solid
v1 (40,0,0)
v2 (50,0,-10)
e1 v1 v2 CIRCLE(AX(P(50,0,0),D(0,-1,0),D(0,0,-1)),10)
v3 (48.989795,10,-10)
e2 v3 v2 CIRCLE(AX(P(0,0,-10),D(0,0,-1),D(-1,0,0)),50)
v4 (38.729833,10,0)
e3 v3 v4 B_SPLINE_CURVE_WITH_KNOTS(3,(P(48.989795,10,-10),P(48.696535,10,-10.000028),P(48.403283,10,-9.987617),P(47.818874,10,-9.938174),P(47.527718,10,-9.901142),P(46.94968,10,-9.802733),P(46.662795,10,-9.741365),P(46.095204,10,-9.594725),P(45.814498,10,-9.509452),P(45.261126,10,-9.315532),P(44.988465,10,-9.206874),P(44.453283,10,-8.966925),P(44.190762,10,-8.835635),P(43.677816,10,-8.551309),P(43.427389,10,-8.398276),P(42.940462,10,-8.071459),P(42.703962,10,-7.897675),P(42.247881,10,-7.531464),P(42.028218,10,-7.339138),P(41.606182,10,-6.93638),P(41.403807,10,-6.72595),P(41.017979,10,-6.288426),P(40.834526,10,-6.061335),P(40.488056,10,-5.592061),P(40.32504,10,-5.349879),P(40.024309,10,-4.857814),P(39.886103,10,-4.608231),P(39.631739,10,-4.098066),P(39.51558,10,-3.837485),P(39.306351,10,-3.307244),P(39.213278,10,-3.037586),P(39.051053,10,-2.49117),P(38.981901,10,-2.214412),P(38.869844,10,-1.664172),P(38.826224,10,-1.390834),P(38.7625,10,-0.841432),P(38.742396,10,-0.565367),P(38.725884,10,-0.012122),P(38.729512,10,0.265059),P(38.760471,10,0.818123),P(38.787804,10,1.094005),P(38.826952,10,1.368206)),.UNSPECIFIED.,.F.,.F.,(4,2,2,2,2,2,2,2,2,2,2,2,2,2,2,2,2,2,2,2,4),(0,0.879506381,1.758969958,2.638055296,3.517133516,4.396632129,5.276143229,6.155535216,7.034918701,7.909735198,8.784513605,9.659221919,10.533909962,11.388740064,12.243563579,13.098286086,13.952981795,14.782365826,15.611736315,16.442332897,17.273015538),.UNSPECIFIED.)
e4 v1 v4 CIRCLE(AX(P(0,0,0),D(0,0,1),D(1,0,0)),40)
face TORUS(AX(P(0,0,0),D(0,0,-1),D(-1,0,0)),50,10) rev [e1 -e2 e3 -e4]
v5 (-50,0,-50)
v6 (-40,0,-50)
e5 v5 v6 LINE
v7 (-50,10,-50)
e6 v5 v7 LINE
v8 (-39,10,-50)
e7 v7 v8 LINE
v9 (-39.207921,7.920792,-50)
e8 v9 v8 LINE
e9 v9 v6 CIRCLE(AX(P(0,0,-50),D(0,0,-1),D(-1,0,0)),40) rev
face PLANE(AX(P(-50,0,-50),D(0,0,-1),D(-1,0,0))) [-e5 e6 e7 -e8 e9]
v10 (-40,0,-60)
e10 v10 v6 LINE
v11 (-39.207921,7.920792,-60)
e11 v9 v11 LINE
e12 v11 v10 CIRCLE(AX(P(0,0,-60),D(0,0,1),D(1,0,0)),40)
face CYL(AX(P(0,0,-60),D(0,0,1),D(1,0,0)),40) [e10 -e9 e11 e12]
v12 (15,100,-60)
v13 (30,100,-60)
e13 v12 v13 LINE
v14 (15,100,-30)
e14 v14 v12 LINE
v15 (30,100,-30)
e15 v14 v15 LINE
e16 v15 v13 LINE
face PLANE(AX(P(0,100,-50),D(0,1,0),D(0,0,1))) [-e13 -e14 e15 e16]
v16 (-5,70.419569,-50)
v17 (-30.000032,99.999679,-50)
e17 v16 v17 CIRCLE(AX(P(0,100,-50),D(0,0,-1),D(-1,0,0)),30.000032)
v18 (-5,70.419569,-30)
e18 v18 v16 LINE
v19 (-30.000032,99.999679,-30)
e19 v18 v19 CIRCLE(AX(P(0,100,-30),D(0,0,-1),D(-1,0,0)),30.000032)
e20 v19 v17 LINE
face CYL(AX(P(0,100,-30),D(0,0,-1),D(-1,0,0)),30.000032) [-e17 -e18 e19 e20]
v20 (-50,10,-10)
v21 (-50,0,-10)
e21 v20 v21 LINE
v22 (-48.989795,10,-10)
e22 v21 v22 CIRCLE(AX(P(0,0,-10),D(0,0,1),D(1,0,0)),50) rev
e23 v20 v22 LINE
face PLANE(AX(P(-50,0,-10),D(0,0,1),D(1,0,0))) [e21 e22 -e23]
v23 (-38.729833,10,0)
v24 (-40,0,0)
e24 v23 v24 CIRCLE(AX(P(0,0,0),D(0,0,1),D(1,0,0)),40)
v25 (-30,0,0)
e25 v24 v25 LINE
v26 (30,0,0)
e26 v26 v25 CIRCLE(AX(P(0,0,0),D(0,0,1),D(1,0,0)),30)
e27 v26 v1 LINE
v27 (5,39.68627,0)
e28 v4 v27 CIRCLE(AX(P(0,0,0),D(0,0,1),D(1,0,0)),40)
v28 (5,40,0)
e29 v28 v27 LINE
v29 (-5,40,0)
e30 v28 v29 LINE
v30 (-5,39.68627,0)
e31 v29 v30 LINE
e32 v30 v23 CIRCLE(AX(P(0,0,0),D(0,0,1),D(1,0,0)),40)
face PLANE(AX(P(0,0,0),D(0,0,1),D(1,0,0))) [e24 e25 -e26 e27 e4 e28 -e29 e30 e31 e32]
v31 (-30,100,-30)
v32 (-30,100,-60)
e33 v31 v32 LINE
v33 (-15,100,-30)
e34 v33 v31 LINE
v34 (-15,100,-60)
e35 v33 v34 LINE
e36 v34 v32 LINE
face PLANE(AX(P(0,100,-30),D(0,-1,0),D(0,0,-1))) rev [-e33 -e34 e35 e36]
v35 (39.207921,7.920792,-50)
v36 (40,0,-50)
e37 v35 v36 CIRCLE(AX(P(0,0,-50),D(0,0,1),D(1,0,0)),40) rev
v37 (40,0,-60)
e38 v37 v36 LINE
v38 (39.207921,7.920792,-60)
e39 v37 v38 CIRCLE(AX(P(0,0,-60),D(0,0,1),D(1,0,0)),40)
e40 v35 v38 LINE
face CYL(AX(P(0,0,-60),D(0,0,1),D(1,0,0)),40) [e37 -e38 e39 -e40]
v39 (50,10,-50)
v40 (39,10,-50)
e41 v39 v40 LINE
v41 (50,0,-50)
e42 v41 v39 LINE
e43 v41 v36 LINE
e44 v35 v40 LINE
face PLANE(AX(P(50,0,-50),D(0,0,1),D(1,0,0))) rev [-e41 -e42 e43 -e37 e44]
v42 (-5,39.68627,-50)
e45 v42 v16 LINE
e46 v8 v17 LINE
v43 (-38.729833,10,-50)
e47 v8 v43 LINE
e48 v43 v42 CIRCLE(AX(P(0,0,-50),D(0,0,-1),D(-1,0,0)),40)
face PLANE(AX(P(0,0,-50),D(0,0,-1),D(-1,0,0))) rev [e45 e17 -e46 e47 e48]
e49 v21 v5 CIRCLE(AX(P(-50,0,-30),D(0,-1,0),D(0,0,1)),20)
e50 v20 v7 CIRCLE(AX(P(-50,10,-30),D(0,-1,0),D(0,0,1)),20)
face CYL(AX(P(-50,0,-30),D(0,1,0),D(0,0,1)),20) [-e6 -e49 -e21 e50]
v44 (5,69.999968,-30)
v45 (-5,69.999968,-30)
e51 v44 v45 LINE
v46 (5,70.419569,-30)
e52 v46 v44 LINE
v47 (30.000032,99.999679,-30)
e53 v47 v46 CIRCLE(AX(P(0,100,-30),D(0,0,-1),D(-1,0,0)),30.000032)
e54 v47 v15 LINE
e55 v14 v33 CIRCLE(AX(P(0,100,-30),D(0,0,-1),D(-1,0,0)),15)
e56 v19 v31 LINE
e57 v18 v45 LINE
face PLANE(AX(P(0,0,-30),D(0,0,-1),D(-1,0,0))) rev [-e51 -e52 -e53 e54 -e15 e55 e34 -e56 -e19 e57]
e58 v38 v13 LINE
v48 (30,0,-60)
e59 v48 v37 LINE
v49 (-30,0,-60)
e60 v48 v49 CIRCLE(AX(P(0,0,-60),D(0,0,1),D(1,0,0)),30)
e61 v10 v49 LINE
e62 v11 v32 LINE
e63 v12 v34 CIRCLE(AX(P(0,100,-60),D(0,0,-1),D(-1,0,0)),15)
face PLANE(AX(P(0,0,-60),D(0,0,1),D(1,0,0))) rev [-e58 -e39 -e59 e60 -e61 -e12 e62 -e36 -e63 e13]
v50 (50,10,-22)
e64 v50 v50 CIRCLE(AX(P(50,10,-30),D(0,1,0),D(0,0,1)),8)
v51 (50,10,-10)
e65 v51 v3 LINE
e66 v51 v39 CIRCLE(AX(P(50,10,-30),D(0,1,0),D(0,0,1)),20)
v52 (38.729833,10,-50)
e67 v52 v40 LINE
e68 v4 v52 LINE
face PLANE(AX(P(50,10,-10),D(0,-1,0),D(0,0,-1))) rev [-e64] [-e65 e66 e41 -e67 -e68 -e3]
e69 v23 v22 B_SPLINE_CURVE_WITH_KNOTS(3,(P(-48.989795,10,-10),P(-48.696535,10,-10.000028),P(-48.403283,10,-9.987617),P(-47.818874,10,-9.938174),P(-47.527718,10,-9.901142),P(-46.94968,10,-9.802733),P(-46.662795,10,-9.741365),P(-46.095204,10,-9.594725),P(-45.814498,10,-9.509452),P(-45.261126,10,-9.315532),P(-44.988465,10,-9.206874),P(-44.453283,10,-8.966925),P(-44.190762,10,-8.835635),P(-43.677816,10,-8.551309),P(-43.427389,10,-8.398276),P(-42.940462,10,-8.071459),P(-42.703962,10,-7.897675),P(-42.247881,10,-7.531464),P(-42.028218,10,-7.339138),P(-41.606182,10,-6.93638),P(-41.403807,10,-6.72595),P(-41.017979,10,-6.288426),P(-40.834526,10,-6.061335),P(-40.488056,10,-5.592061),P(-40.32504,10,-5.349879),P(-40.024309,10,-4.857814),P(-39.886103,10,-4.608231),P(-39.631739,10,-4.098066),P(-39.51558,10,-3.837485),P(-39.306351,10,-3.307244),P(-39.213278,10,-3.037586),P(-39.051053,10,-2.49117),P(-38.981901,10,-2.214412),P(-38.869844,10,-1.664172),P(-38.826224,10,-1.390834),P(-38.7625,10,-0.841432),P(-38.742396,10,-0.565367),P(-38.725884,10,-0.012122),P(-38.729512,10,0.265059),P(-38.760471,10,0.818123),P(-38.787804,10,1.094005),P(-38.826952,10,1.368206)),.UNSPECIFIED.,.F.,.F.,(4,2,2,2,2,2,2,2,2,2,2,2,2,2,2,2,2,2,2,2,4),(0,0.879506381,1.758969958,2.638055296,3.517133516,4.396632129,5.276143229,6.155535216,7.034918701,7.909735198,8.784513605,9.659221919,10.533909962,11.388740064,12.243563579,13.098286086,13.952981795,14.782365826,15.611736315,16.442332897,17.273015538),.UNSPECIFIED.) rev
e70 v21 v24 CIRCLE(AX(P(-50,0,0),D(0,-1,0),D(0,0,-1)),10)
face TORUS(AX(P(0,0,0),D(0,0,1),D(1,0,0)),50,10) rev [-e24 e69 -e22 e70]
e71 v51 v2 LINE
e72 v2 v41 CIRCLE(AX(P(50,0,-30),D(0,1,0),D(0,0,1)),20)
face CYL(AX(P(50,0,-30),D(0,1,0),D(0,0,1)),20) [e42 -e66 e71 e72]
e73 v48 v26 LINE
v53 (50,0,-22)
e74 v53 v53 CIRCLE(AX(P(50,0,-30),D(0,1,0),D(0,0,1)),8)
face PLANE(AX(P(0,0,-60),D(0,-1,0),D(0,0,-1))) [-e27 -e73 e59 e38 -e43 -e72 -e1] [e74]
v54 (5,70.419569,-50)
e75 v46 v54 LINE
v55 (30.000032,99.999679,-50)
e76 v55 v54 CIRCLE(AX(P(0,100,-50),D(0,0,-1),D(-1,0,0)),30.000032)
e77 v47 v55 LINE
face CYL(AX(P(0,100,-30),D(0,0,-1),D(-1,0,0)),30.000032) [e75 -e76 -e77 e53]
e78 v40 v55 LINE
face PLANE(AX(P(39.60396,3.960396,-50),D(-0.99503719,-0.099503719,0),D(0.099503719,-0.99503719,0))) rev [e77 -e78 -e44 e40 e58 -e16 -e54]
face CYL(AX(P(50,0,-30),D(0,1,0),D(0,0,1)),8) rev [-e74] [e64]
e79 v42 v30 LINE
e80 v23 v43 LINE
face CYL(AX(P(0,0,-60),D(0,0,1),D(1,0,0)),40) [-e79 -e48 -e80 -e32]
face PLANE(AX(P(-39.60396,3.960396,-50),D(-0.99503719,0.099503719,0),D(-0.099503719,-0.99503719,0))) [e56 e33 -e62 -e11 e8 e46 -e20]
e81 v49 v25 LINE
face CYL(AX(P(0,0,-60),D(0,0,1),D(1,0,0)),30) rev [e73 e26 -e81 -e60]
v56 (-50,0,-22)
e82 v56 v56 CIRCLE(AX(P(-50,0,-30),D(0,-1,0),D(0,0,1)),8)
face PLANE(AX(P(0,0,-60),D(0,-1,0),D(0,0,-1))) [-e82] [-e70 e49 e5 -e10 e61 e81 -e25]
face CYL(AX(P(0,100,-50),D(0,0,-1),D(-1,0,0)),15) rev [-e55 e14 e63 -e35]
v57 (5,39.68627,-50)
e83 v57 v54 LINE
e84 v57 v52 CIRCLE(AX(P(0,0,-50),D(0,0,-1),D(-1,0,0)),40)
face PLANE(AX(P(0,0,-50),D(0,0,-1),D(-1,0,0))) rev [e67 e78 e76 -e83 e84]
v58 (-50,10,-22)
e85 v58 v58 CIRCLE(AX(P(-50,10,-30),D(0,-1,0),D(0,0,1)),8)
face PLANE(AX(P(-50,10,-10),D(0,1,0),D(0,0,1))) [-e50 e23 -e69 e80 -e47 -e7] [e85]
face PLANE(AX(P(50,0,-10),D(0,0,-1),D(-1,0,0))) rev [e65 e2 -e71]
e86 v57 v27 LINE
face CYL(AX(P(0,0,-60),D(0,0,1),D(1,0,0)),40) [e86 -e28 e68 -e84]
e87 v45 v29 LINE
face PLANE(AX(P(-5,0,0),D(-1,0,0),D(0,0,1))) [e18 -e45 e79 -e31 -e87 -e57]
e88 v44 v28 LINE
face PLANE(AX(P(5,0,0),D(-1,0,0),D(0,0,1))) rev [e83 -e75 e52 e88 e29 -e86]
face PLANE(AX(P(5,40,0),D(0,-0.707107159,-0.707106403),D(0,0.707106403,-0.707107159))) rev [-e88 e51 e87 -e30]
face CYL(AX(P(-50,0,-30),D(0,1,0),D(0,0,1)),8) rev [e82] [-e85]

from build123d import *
from build123d.topology import SkipClean

# Parameters (mm, degrees)
BOSS_EXTRUDE2_DEPTH  = 60
BOSS_EXTRUDE3_START  = 30
SKETCH4_W            = 40
SKETCH4_H            = 10
BOSS_EXTRUDE3_DEPTH  = 20
FILLET1_R            = 10
FILLET2_R            = 10
BOSS_EXTRUDE7_DEPTH  = 10
CUT_EXTRUDE2_DEPTH   = 10
BOSS_EXTRUDE8_START  = -10
BOSS_EXTRUDE8_DEPTH  = 10
BOSS_EXTRUDE18_START = -30
BOSS_EXTRUDE18_DEPTH = 20
MIRROR9_START        = -60
MIRROR9_DEPTH        = 30
BOSS_EXTRUDE20_DEPTH = 5


# Read off the part's stored shape, not the designer's step: Boss-Extrude8, Boss-Extrude18, Mirror9
with BuildPart() as part:
    # Sketch1 → Boss-Extrude2 (new body)
    with BuildSketch(Plane.XY):
        with BuildLine():
            ThreePointArc((40, 0), (0, 40), (-40, 0))
            Line((-40, 0), (-30, 0))
            ThreePointArc((-30, 0), (0, 30), (30, 0))
            Line((30, 0), (40, 0))
        make_face()
    extrude(amount=-BOSS_EXTRUDE2_DEPTH)

    # Sketch4 → Boss-Extrude3 (add)
    with BuildSketch(Plane(origin=(0, 0, 0), x_dir=(0, 0, -1), z_dir=(1, 0, 0)).offset(BOSS_EXTRUDE3_START)):
        with Locations((30, 5)):
            Rectangle(SKETCH4_W, SKETCH4_H)
    boss_extrude3 = extrude(amount=BOSS_EXTRUDE3_DEPTH)

    # Mirror1: Boss-Extrude3 across plane
    add(boss_extrude3.mirror(Plane(origin=(0, 0, 0), x_dir=(0, 0, 1), z_dir=(1, 0, 0))))

    # Fillet1
    fillet1_edges = [part.edges().sort_by_distance(p)[0] for p in [
        (-39.681187851, 5.040171699, -10),
    ]]
    fillet(fillet1_edges, radius=FILLET1_R - 0.0001)  # a hair under: the kernel refuses the full size

    # Fillet2
    fillet2_edges = [part.edges().sort_by_distance(p)[0] for p in [
        (39.681187851, 5.040171699, -10),
    ]]
    fillet(fillet2_edges, radius=FILLET2_R - 0.0001)  # a hair under: the kernel refuses the full size

    # Sketch5 → Boss-Extrude7 (add)
    with BuildSketch(Plane(origin=(0, 10, 0), x_dir=(1, 0, 0), z_dir=(0, 1, 0))):
        with BuildLine():
            ThreePointArc((50, 10), (70, 30), (50, 50))
            Line((50, 50), (50, 38))
            ThreePointArc((50, 38), (55.656854249, 35.656854249), (58, 30))
            ThreePointArc((58, 30), (55.656854249, 24.343145751), (50, 22))
            Line((50, 22), (50, 10))
        make_face()
    boss_extrude7 = extrude(amount=-BOSS_EXTRUDE7_DEPTH)

    # Sketch5<5> → Cut-Extrude2 (cut)
    with SkipClean():  # the faces are left unmerged after this step: merging them gives an invalid solid
        with BuildSketch(Plane(origin=(0, 10, 0), x_dir=(1, 0, 0), z_dir=(0, 1, 0))):
            with BuildLine():
                Line((50, 22), (50, 38))
                ThreePointArc((50, 38), (42, 30), (50, 22))
            make_face()
            with BuildLine():
                ThreePointArc((58, 30), (55.656854249, 35.656854249), (50, 38))
                Line((50, 38), (50, 22))
                ThreePointArc((50, 22), (55.656854249, 24.343145751), (58, 30))
            make_face()
        cut_extrude2 = extrude(amount=-CUT_EXTRUDE2_DEPTH, mode=Mode.SUBTRACT)

    # Mirror3: Boss-Extrude7, Cut-Extrude2 across plane
    with SkipClean():  # the faces are left unmerged after this step: merging them gives an invalid solid
        add(boss_extrude7.mirror(Plane(origin=(0, 0, 0), x_dir=(0, 0, 1), z_dir=(1, 0, 0))))
        add(cut_extrude2.mirror(Plane(origin=(0, 0, 0), x_dir=(0, 0, 1), z_dir=(1, 0, 0))), mode=Mode.SUBTRACT)

    # Boss-Extrude8 outline → Boss-Extrude8 (add)
    with SkipClean():  # the faces are left unmerged after this step: merging them gives an invalid solid
        with BuildSketch(Plane(origin=(0, 0, -60), x_dir=(-1, 0, 0), z_dir=(0, 0, -1)).offset(BOSS_EXTRUDE8_START)):
            with BuildLine():
                ThreePointArc((30.000032068, 99.999679323), (21.213112735, 78.786660512), (0, 69.999967931))
                Line((0, 69.999967931), (0, 85))
                ThreePointArc((0, 85), (-10.606601718, 89.393398282), (-15, 100))
                Line((-15, 100), (-30, 100))
                Line((-30, 100), (-39.207920792, 7.920792079))
                ThreePointArc((-39.207920792, 7.920792079), (0, 40), (39.207920792, 7.920792079))
                Line((39.207920792, 7.920792079), (30.000032068, 99.999679323))
            make_face()
        extrude(amount=BOSS_EXTRUDE8_DEPTH)

    # Boss-Extrude18 outline → Boss-Extrude18 (add)
    with SkipClean():  # the faces are left unmerged after this step: merging them gives an invalid solid
        with BuildSketch(Plane(origin=(0, 0, -60), x_dir=(-1, 0, 0), z_dir=(0, 0, -1)).offset(BOSS_EXTRUDE18_START)):
            with BuildLine():
                ThreePointArc((0, 85), (-10.606601718, 89.393398282), (-15, 100))
                Line((-15, 100), (-30, 100))
                Line((-30, 100), (-30.000032068, 99.999679323))
                ThreePointArc((-30.000032068, 99.999679323), (-21.213112735, 78.786660512), (0, 69.999967931))
                Line((0, 69.999967931), (0, 85))
            make_face()
        extrude(amount=BOSS_EXTRUDE18_DEPTH)

    # Mirror9 outline → Mirror9 (add)
    with SkipClean():  # the faces are left unmerged after this step: merging them gives an invalid solid
        with BuildSketch(Plane.XY.offset(MIRROR9_START)):
            with BuildLine():
                Line((-15, 100), (-30, 100))
                Line((-30, 100), (-30.000032068, 99.999679323))
                ThreePointArc((-30.000032068, 99.999679323), (-21.213112735, 78.786660512), (0, 69.999967931))
                Line((0, 69.999967931), (0, 85))
                ThreePointArc((0, 85), (-10.606601718, 89.393398282), (-15, 100))
            make_face()
        extrude(amount=MIRROR9_DEPTH)

    # Sketch7 → Boss-Extrude20 (add, symmetric)
    with SkipClean():  # the faces are left unmerged after this step: merging them gives an invalid solid
        with BuildSketch(Plane(origin=(0, 0, 0), x_dir=(0, 0, -1), z_dir=(1, 0, 0))):
            Polygon((0, 40), (30, 69.999967931), (30, 70.999967931), (50, 70.999967931), (50, 69.999967931), (50, 40), (50, 39), (0, 39), align=None)
        extrude(amount=BOSS_EXTRUDE20_DEPTH, both=True)


solid = part.part
